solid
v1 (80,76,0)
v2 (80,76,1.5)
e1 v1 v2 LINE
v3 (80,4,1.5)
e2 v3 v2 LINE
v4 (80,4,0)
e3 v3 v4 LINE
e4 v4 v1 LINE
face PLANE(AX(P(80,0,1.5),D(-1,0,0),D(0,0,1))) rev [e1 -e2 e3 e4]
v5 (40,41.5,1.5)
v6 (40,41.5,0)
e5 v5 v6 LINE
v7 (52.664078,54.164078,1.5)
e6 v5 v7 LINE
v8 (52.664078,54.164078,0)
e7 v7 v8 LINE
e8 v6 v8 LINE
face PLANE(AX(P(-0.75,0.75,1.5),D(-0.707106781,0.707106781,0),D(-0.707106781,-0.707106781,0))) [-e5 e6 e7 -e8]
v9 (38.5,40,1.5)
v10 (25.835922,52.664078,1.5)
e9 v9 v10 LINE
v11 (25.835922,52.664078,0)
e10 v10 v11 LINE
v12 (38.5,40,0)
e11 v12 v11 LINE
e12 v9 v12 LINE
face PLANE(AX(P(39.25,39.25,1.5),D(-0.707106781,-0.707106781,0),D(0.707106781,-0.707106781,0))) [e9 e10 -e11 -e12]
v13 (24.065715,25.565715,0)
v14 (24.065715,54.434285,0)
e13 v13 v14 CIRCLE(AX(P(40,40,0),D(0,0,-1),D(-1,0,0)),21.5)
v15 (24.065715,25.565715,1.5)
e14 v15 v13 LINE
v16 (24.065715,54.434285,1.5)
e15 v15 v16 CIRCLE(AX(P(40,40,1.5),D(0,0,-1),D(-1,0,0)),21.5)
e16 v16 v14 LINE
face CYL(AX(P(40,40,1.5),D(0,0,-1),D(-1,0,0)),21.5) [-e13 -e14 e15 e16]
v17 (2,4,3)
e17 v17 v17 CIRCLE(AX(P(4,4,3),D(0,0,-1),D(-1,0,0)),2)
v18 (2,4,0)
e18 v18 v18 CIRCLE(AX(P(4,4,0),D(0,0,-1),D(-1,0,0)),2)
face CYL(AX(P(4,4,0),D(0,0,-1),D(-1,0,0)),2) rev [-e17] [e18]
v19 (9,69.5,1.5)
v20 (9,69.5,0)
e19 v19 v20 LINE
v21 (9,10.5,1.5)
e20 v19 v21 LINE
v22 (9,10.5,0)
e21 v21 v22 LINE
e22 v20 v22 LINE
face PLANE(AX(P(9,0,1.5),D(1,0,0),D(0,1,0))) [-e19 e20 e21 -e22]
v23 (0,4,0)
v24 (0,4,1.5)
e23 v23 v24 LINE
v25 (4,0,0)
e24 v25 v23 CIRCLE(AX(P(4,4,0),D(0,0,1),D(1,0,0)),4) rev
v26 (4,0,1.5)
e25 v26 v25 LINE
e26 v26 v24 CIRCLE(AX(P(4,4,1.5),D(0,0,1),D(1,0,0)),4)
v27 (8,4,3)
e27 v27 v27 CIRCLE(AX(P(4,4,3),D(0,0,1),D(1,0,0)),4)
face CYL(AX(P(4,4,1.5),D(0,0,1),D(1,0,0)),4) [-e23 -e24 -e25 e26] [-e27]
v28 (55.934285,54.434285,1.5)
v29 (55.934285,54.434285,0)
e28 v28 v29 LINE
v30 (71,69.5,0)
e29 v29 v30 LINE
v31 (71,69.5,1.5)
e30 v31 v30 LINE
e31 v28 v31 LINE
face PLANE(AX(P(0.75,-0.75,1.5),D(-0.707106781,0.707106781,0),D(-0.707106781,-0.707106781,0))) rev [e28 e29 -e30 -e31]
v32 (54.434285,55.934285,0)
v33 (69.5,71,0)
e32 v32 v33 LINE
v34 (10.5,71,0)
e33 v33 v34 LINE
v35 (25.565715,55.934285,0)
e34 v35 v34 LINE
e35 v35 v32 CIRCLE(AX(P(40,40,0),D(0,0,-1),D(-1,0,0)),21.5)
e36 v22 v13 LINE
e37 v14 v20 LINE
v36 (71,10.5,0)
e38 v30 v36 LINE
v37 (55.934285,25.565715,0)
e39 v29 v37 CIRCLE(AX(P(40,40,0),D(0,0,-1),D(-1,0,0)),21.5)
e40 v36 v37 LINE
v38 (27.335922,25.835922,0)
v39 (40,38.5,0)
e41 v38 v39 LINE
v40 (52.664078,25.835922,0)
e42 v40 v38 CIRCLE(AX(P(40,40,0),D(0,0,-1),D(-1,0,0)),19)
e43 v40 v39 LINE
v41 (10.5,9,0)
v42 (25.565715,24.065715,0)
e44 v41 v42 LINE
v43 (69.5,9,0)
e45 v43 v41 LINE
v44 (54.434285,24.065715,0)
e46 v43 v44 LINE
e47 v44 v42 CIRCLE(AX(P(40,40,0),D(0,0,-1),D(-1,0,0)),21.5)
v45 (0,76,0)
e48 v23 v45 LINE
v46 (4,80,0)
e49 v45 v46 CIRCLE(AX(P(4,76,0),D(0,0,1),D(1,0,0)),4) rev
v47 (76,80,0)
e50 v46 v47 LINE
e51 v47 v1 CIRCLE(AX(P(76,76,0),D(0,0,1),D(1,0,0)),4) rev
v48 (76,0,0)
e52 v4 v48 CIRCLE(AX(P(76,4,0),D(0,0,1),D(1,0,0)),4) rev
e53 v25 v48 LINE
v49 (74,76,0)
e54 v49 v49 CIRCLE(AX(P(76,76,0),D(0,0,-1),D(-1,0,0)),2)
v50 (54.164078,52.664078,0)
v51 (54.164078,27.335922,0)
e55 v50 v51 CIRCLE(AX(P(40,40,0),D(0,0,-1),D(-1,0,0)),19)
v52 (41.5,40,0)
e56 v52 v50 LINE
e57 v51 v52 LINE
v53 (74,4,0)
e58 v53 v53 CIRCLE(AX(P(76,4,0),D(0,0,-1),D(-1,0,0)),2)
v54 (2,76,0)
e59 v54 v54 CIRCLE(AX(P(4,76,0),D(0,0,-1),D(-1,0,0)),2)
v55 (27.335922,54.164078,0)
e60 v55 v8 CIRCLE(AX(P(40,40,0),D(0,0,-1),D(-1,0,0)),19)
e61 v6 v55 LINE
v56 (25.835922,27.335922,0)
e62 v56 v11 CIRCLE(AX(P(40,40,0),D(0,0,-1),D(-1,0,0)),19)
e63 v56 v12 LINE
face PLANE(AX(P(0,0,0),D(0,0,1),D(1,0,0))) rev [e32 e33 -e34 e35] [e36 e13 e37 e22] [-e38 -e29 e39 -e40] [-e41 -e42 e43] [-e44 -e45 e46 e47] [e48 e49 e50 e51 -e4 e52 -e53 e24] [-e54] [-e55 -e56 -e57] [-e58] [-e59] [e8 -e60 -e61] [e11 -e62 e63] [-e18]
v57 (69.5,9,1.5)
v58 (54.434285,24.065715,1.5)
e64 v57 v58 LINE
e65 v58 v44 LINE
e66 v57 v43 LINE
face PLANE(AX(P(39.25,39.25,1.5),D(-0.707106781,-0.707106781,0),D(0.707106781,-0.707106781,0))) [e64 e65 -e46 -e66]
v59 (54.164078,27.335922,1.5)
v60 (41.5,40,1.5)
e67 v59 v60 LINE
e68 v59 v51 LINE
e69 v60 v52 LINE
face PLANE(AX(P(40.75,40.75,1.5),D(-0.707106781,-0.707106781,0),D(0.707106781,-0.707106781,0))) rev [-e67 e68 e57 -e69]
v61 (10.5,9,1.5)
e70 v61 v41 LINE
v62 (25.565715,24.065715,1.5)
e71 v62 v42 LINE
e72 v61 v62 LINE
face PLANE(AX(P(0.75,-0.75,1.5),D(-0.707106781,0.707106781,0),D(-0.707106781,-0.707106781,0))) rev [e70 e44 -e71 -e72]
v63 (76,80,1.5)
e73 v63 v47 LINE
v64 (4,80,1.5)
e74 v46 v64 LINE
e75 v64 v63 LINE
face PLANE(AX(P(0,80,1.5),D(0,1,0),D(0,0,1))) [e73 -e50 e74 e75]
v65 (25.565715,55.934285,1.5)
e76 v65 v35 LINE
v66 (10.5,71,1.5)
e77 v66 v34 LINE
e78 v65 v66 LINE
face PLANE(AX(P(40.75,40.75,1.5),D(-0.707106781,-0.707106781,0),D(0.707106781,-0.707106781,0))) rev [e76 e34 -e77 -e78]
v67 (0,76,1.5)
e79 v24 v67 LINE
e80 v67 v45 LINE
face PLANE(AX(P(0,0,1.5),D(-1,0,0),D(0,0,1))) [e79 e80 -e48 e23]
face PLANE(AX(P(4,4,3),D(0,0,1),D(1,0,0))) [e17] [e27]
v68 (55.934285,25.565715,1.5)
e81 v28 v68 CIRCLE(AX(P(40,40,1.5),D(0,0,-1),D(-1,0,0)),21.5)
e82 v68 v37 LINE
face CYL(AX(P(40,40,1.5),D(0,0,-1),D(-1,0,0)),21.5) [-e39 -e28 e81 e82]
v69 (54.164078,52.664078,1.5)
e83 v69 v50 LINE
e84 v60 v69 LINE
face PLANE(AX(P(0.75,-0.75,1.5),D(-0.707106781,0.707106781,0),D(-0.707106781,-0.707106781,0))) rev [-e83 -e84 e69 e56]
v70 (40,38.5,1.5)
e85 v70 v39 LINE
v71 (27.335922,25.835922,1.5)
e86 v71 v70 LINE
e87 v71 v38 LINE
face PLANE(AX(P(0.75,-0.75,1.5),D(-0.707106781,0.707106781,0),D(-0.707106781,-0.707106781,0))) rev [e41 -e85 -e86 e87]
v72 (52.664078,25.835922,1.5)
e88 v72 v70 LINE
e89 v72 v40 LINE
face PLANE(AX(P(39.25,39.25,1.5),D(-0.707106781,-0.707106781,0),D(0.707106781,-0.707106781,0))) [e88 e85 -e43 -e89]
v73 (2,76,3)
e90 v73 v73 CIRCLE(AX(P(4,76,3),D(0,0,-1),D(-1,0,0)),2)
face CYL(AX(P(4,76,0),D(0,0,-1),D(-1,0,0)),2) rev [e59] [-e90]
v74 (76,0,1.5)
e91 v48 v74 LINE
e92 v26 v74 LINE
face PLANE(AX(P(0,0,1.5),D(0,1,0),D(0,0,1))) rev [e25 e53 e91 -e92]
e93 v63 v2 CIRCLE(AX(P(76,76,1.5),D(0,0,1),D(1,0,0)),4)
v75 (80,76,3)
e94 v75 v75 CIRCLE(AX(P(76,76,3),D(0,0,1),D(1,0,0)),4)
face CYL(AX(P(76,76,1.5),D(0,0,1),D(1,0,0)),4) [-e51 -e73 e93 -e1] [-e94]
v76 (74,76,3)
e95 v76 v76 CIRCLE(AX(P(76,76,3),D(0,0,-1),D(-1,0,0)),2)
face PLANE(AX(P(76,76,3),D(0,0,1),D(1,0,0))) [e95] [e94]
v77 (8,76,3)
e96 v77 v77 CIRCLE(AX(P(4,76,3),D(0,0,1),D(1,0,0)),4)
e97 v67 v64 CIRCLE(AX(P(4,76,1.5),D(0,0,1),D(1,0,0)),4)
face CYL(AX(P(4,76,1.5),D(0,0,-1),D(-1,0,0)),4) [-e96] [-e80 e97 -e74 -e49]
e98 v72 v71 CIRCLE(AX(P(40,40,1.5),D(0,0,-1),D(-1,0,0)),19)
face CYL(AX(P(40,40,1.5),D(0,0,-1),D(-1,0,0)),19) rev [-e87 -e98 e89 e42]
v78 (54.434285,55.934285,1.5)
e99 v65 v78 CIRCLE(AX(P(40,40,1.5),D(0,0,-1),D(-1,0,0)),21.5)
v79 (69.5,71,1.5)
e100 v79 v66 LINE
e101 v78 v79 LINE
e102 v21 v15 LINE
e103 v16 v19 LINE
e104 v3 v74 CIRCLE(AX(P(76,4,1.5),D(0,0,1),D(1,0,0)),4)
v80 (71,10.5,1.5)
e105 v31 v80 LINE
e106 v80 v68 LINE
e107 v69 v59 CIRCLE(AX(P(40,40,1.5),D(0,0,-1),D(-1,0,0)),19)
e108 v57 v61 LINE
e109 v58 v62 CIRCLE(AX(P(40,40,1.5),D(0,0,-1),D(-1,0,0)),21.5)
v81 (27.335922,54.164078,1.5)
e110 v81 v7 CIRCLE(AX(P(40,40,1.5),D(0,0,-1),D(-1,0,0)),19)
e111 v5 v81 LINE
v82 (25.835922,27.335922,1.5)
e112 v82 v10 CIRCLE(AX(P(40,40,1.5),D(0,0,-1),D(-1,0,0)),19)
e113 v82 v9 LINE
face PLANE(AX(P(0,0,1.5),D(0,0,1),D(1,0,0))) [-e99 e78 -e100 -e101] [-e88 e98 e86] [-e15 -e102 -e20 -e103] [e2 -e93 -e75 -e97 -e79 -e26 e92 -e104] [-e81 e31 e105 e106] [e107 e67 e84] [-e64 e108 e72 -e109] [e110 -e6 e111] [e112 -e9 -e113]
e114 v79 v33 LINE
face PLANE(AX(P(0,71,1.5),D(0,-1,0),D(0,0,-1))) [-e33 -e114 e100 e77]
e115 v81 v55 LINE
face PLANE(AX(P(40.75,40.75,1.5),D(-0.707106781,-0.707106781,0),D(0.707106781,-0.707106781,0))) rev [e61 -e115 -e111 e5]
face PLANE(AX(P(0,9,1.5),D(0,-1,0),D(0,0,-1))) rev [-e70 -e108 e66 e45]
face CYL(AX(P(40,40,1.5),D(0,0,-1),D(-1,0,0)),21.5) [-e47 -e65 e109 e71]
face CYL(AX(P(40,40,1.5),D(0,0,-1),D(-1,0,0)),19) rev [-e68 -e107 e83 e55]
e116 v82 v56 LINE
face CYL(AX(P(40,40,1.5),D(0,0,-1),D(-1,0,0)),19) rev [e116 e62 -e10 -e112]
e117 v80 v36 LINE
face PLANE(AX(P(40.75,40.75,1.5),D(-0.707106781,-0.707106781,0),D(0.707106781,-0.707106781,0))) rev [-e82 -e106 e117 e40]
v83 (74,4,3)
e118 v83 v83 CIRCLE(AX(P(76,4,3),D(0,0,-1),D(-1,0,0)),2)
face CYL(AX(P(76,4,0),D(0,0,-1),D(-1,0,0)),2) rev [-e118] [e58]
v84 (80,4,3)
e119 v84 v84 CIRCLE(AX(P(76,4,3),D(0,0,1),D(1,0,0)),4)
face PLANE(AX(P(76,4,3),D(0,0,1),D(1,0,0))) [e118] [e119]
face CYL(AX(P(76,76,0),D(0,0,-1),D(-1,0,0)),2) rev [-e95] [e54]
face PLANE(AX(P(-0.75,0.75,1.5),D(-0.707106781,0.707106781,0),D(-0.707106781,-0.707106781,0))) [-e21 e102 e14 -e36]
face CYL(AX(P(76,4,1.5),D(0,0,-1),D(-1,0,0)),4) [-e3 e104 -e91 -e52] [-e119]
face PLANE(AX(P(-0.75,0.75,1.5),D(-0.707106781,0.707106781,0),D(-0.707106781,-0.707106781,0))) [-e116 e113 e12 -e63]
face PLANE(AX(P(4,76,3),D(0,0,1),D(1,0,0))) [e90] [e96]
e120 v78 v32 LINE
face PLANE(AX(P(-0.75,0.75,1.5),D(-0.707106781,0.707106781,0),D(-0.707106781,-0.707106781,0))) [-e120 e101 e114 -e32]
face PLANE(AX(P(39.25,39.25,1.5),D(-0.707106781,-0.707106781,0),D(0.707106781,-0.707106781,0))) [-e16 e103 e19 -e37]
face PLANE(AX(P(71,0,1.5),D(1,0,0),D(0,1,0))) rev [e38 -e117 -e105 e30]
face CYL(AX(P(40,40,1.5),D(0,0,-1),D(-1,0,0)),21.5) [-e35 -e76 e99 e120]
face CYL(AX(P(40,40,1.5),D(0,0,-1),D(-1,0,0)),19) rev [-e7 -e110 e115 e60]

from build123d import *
from build123d.topology import SkipClean

# Parameters (mm, degrees)
SKETCH1_W             = 80
SKETCH1_H             = 80
BOSS_EXTRUDE1_DEPTH   = 1.5
FILLET1_R             = 4
BOSS_EXTRUDE2_START   = 1.5
SKETCH2_R             = 4
BOSS_EXTRUDE2_DEPTH   = 1.5
F_4_0MM_DOWEL_HOLE1_D = 4
CUT_EXTRUDE1_DEPTH    = 1.5


with BuildPart() as part:
    # Sketch1 → Boss-Extrude1 (new body)
    with BuildSketch(Plane.XY):
        with Locations((40, 40)):
            Rectangle(SKETCH1_W, SKETCH1_H)
    extrude(amount=BOSS_EXTRUDE1_DEPTH)

    # Fillet1
    fillet1_edges = [part.edges().sort_by_distance(p)[0] for p in [
        (0, 0, 0.75),
        (80, 0, 0.75),
        (80, 80, 0.75),
        (0, 80, 0.75),
    ]]
    fillet(fillet1_edges, radius=FILLET1_R)

    # Sketch2 → Boss-Extrude2 (add)
    with SkipClean():  # the faces are left unmerged after this step: merging them gives an invalid solid
        with BuildSketch(Plane.XY.offset(1.5).offset(BOSS_EXTRUDE2_START)):
            with Locations((4, 76)):
                Circle(SKETCH2_R)
            with Locations((76, 76)):
                Circle(SKETCH2_R)
            with Locations((4, 4)):
                Circle(SKETCH2_R)
            with Locations((76, 4)):
                Circle(SKETCH2_R)
        extrude(amount=-BOSS_EXTRUDE2_DEPTH)

    # Ø4.0mm Dowel Hole1 (through all)
    with Locations(Plane(origin=(0, 0, 0), x_dir=(-1, 0, 0), z_dir=(0, 0, -1))):
        with Locations((-4, 4), (-76, 4), (-76, 76), (-4, 76)):
            Hole(F_4_0MM_DOWEL_HOLE1_D / 2)

    # Sketch5 → Cut-Extrude1 (cut)
    with SkipClean():  # the faces are left unmerged after this step: merging them gives an invalid solid
        with BuildSketch(Plane(origin=(0, 0, 0), x_dir=(-1, 0, 0), z_dir=(0, 0, -1))):
            with BuildLine():
                Line((-10.5, 71), (-69.5, 71))
                Line((-69.5, 71), (-54.434284639, 55.934284639))
                ThreePointArc((-54.434284639, 55.934284639), (-40, 61.5), (-25.565715361, 55.934284639))
                Line((-25.565715361, 55.934284639), (-10.5, 71))
            make_face()
            with BuildLine():
                Line((-55.934284639, 54.434284639), (-71, 69.5))
                Line((-71, 69.5), (-71, 10.5))
                Line((-71, 10.5), (-55.934284639, 25.565715361))
                ThreePointArc((-55.934284639, 25.565715361), (-61.5, 40), (-55.934284639, 54.434284639))
            make_face()
            with BuildLine():
                Line((-9, 10.5), (-9, 69.5))
                Line((-9, 69.5), (-24.065715361, 54.434284639))
                ThreePointArc((-24.065715361, 54.434284639), (-18.5, 40), (-24.065715361, 25.565715361))
                Line((-24.065715361, 25.565715361), (-9, 10.5))
            make_face()
            with BuildLine():
                Line((-54.434284639, 24.065715361), (-69.5, 9))
                Line((-69.5, 9), (-10.5, 9))
                Line((-10.5, 9), (-25.565715361, 24.065715361))
                ThreePointArc((-25.565715361, 24.065715361), (-40, 18.5), (-54.434284639, 24.065715361))
            make_face()
            with BuildLine():
                Line((-54.164078425, 27.335921575), (-41.5, 40))
                Line((-41.5, 40), (-54.164078425, 52.664078425))
                ThreePointArc((-54.164078425, 52.664078425), (-59, 40), (-54.164078425, 27.335921575))
            make_face()
            with BuildLine():
                Line((-52.664078425, 54.164078425), (-40, 41.5))
                Line((-40, 41.5), (-27.335921575, 54.164078425))
                ThreePointArc((-27.335921575, 54.164078425), (-40, 59), (-52.664078425, 54.164078425))
            make_face()
            with BuildLine():
                Line((-25.835921575, 52.664078425), (-38.5, 40))
                Line((-38.5, 40), (-25.835921575, 27.335921575))
                ThreePointArc((-25.835921575, 27.335921575), (-21, 40), (-25.835921575, 52.664078425))
            make_face()
            with BuildLine():
                Line((-40, 38.5), (-52.664078425, 25.835921575))
                ThreePointArc((-52.664078425, 25.835921575), (-40, 21), (-27.335921575, 25.835921575))
                Line((-27.335921575, 25.835921575), (-40, 38.5))
            make_face()
        extrude(amount=-CUT_EXTRUDE1_DEPTH, mode=Mode.SUBTRACT)
    add(part.part.scale(1), mode=Mode.REPLACE)  # the faces are merged on a copy


solid = part.part
